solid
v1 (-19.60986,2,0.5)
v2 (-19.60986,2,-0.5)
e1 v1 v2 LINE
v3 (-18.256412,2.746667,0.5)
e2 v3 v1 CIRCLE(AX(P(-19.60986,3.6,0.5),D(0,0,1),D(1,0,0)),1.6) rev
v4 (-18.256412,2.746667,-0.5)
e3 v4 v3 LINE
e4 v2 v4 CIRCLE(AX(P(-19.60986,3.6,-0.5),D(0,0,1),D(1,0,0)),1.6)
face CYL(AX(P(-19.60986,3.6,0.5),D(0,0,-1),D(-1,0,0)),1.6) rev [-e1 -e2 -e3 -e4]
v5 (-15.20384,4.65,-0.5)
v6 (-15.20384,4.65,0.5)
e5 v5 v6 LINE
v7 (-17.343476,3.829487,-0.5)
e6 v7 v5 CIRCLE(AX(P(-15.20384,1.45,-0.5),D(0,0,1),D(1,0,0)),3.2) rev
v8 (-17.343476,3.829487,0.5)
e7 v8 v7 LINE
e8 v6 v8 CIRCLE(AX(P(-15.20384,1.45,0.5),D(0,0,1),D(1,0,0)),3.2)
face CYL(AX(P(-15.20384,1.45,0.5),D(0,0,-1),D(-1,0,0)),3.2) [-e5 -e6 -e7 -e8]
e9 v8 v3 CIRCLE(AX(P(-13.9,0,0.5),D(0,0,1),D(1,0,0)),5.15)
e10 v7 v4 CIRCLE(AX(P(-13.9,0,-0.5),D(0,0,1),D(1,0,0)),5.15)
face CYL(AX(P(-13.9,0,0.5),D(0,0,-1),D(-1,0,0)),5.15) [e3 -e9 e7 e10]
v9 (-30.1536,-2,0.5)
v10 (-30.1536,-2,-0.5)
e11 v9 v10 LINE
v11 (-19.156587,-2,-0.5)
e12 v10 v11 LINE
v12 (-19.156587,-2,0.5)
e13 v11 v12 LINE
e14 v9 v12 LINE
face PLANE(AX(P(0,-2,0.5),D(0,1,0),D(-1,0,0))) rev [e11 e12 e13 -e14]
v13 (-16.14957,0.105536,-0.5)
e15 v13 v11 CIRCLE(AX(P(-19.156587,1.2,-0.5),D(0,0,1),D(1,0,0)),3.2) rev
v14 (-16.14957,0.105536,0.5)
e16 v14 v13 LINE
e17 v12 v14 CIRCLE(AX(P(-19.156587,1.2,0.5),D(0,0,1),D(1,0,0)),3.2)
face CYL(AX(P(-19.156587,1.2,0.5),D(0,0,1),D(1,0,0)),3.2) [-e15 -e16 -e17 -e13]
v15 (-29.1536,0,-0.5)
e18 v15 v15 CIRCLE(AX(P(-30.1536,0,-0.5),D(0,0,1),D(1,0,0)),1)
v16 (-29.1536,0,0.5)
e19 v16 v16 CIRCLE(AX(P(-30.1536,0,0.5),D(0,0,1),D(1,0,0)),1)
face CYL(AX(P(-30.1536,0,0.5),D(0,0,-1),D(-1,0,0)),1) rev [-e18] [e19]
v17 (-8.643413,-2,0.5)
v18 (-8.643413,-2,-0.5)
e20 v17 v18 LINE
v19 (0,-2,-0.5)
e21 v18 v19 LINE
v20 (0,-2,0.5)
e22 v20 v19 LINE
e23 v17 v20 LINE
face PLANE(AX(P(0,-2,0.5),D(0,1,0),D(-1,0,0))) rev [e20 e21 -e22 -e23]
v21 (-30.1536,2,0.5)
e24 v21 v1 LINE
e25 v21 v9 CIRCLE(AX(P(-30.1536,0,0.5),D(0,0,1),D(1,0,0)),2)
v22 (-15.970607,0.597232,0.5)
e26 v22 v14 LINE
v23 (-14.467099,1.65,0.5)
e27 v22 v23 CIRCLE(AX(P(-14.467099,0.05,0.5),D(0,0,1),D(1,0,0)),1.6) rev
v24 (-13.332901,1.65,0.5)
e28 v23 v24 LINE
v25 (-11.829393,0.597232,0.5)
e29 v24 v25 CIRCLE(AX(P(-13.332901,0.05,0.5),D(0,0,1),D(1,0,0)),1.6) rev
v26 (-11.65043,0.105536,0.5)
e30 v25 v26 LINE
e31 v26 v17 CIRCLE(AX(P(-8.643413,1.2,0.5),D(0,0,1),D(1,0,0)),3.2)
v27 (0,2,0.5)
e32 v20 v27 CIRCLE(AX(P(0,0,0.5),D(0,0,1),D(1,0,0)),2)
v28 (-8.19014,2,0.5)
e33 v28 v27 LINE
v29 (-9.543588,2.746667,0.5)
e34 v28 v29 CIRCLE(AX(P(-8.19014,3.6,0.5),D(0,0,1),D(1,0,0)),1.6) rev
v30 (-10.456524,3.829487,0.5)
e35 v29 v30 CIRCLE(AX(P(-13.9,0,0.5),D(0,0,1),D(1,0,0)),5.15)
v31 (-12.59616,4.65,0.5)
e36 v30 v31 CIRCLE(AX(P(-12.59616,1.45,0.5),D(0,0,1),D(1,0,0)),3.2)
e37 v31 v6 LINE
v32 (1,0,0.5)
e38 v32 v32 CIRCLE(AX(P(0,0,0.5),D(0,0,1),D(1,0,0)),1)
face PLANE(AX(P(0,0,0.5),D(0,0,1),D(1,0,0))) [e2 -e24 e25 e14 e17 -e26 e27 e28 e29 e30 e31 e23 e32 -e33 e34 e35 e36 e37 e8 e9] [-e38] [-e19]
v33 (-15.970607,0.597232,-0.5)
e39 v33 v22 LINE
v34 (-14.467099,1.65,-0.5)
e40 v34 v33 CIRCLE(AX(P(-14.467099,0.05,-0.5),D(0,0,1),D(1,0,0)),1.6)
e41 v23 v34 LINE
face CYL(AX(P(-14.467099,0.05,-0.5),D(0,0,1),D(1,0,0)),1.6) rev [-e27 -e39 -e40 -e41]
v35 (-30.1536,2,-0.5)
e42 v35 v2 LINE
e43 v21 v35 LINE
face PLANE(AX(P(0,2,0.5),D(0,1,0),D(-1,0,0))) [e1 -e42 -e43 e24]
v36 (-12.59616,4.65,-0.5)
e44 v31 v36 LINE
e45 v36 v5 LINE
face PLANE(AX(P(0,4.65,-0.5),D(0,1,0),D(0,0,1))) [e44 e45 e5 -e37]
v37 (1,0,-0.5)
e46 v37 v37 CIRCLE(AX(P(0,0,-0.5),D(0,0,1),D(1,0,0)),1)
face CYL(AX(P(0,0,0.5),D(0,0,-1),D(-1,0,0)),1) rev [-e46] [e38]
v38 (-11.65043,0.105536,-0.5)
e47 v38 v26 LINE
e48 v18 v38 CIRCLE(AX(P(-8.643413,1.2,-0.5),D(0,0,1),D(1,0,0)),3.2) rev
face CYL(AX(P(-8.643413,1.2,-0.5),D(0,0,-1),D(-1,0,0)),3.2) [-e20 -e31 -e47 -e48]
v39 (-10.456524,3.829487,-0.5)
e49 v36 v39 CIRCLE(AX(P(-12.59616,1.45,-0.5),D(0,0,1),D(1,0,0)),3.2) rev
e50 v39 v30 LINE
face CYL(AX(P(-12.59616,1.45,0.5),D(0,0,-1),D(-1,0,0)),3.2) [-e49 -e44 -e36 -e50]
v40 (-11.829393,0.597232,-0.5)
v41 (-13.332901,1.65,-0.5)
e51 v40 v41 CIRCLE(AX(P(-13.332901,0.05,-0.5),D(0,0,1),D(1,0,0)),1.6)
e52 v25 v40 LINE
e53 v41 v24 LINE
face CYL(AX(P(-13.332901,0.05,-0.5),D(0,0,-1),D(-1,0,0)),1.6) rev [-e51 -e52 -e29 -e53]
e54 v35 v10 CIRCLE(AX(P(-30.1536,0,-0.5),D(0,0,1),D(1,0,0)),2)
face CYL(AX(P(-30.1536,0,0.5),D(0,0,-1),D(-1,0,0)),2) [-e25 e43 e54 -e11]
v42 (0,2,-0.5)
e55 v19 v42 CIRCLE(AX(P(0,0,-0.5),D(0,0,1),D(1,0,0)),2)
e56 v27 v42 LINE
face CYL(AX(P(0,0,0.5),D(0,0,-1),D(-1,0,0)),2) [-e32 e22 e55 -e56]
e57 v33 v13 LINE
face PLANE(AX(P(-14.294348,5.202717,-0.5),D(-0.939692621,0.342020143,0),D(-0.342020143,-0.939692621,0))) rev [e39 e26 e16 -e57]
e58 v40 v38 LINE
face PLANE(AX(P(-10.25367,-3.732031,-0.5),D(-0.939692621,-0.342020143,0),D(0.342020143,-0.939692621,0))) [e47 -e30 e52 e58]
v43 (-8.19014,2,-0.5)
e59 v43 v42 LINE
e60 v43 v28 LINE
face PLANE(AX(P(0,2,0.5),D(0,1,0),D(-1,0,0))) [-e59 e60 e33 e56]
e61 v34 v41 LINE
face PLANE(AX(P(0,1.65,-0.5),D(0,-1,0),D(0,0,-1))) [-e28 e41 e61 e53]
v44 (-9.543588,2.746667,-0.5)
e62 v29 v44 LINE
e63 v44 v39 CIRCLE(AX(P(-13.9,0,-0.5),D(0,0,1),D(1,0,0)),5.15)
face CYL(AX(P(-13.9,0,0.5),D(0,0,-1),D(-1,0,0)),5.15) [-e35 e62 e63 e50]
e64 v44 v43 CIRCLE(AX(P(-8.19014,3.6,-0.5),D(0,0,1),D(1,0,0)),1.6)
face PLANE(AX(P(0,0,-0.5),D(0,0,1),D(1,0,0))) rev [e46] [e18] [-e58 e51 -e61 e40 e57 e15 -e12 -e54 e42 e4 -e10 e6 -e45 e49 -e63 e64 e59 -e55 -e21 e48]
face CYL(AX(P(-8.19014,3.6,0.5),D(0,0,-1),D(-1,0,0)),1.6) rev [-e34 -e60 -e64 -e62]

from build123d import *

# Parameters (mm, degrees)
SKETCH_1_R      = 1
EXTRUDE_1_DEPTH = 0.5
EXTRUDE1_DEPTH  = 0.5
EXTRUDE2_DEPTH  = 0.5
FILLET1_R       = 1.6
FILLET2_R       = 3.2


with BuildPart() as part:
    # Эскиз1 → Бобышка-Вытянуть1 (new, symmetric)
    with BuildSketch(Plane.XY):
        with BuildLine():
            Line((0, 2), (-30.1536, 2))
            ThreePointArc((-30.1536, 2), (-32.1536, 0), (-30.1536, -2))
            Line((-30.1536, -2), (0, -2))
            ThreePointArc((0, -2), (2, 0), (0, 2))
        make_face()
        with Locations((-30.1536, 0)):
            Circle(SKETCH_1_R, mode=Mode.SUBTRACT)
        Circle(SKETCH_1_R, mode=Mode.SUBTRACT)
    extrude(amount=EXTRUDE_1_DEPTH, both=True)

    # Sketch2 → Extrude1 (add, symmetric)
    with BuildSketch(Plane.XY):
        with BuildLine():
            Line((-11.879660865, 0.735343308), (-10.884077321, -2))
            Line((-10.884077321, -2), (-9.154212394, -2))
            ThreePointArc((-9.154212394, -2), (-13.9, 5.15), (-18.645787606, -2))
            Line((-18.645787606, -2), (-16.915922679, -2))
            Line((-16.915922679, -2), (-15.920339135, 0.735343308))
            ThreePointArc((-15.920339135, 0.735343308), (-15.659833636, 1.235105491), (-15.278404875, 1.65))
            Line((-15.278404875, 1.65), (-12.521595125, 1.65))
            ThreePointArc((-12.521595125, 1.65), (-12.140166364, 1.235105491), (-11.879660865, 0.735343308))
        make_face()
    extrude(amount=EXTRUDE1_DEPTH, both=True)

    # Sketch → Extrude2 (cut, symmetric)
    with BuildSketch(Plane.XY):
        with BuildLine():
            Line((-10.884077321, -2), (-11.879660865, 0.735343308))
            ThreePointArc((-11.879660865, 0.735343308), (-12.140166364, 1.235105491), (-12.521595125, 1.65))
            Line((-12.521595125, 1.65), (-15.278404875, 1.65))
            ThreePointArc((-15.278404875, 1.65), (-15.659833636, 1.235105491), (-15.920339135, 0.735343308))
            Line((-15.920339135, 0.735343308), (-16.915922679, -2))
            Line((-16.915922679, -2), (-10.884077321, -2))
        make_face()
        with BuildLine():
            ThreePointArc((-11.686405638, 4.65), (-13.9, 5.15), (-16.113594362, 4.65))
            Line((-16.113594362, 4.65), (-11.686405638, 4.65))
        make_face()
    extrude(amount=EXTRUDE2_DEPTH, both=True, mode=Mode.SUBTRACT)

    # Fillet1
    fillet1_edges = [part.edges().sort_by_distance(p)[0] for p in [
        (-9.154212394, 2, 0),
        (-18.645787606, 2, 0),
        (-12.521595125, 1.65, 0),
        (-15.278404875, 1.65, 0),
    ]]
    fillet(fillet1_edges, radius=FILLET1_R)

    # Fillet2
    fillet2_edges = [part.edges().sort_by_distance(p)[0] for p in [
        (-10.884077321, -2, 0),
        (-16.915922679, -2, 0),
        (-11.686405638, 4.65, 0),
        (-16.113594362, 4.65, 0),
    ]]
    fillet(fillet2_edges, radius=FILLET2_R)


solid = part.part
